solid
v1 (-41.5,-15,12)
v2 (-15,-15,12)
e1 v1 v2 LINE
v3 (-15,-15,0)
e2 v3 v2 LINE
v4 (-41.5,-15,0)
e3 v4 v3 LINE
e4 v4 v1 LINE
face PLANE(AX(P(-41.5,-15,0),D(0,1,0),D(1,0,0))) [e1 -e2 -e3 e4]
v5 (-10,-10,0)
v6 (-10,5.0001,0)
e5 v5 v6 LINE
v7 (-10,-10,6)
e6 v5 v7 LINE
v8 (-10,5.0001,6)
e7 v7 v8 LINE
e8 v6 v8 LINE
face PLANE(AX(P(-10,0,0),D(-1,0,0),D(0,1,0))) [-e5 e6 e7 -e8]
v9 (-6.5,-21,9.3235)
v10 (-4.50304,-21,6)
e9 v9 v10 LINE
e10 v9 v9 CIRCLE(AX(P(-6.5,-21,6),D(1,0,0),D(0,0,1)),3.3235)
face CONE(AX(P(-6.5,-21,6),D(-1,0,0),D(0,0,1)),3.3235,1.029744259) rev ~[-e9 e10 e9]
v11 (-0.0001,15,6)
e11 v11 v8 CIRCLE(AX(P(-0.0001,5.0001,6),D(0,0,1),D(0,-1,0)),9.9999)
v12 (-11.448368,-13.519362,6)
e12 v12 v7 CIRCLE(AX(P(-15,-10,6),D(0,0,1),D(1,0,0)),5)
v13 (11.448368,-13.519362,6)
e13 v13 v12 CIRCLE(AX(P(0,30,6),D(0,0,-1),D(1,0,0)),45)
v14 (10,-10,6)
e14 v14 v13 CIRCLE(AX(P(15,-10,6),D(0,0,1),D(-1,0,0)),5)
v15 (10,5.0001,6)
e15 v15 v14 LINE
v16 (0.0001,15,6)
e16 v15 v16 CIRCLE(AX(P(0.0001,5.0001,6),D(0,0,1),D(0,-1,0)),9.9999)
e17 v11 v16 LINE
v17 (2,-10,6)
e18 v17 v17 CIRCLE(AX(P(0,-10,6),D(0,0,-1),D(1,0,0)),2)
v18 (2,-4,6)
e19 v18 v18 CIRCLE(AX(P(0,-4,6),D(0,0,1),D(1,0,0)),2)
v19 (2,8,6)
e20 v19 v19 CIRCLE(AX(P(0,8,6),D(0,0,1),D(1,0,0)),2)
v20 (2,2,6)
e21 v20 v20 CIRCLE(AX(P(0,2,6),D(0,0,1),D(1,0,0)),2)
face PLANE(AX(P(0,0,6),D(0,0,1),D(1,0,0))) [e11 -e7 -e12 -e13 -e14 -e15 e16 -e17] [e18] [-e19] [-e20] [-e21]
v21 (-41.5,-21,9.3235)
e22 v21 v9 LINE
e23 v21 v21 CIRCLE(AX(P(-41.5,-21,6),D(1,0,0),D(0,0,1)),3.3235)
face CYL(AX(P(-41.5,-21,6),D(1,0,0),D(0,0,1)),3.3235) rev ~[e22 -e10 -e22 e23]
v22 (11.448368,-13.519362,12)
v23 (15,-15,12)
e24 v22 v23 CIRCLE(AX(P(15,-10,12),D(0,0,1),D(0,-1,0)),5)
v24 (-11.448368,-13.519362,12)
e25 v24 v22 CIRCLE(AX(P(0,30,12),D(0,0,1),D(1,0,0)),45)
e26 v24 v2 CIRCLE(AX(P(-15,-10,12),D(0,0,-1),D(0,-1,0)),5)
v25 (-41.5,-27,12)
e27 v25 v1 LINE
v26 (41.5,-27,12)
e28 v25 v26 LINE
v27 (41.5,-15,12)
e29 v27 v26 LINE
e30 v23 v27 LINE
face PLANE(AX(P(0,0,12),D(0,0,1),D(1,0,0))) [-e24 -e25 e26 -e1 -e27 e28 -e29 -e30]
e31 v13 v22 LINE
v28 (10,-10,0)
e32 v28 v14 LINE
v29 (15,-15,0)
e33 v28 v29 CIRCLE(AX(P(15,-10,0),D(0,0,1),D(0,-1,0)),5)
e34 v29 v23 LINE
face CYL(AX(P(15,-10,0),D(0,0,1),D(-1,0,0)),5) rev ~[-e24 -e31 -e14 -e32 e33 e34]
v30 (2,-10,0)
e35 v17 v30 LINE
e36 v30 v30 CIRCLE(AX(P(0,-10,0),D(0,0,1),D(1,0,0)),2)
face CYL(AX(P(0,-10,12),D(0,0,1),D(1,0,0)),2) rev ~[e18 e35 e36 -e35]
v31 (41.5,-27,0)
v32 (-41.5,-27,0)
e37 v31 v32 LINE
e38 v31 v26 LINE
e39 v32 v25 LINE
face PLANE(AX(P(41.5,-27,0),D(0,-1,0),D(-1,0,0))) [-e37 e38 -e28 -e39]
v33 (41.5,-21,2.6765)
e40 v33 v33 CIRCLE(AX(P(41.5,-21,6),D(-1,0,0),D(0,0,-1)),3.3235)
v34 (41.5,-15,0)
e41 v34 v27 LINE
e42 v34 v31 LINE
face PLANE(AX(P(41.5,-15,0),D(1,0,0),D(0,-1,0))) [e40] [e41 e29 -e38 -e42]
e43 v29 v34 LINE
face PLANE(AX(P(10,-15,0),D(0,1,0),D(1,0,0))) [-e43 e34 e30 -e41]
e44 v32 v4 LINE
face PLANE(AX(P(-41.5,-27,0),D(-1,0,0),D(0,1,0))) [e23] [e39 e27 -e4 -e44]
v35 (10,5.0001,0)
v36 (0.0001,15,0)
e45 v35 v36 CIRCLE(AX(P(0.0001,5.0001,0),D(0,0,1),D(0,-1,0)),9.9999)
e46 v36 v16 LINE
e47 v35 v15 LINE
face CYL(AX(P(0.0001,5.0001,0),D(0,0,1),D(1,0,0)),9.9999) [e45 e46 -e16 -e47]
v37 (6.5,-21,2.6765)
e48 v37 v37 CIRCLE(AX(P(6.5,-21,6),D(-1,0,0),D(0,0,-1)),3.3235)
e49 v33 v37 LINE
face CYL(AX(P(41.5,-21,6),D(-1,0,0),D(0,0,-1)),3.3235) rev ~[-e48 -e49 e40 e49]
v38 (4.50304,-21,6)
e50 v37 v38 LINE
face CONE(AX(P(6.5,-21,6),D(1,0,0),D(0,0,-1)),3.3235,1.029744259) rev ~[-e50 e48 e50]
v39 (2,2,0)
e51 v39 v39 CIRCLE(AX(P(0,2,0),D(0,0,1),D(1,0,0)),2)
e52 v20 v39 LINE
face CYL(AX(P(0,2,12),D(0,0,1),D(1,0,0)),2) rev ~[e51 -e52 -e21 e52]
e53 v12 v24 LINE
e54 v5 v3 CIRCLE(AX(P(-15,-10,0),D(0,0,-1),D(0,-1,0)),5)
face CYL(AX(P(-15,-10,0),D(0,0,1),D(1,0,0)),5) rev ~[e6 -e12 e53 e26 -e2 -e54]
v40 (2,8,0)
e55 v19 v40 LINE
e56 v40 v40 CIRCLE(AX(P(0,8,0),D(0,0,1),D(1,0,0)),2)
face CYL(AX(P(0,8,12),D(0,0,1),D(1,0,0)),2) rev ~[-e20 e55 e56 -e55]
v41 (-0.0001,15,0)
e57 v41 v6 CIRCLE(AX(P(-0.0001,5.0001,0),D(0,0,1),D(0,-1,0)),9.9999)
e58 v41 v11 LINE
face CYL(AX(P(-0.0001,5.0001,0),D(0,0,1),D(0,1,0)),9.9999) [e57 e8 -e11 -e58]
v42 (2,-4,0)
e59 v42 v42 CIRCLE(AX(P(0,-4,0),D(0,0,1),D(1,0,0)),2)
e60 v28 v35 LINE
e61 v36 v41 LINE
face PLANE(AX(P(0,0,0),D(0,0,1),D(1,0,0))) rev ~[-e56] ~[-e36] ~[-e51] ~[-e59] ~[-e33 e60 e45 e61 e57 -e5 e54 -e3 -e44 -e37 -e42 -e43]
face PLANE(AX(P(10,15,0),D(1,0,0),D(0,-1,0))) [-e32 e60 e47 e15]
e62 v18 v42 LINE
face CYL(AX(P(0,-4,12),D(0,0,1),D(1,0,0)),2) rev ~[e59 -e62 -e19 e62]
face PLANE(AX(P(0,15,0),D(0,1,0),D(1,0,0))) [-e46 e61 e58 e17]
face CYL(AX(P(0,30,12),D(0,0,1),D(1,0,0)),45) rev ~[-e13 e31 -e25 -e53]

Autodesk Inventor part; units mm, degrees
ref_plane "YZ Plane" through (0, 0, 0) normal (1, 0, 0) x (0, 1, 0)
ref_plane "XZ Plane" through (0, 0, 0) normal (0, 1, 0) x (-1, 0, 0)
ref_plane "XY Plane" through (0, 0, 0) normal (0, 0, 1) x (1, 0, 0)
sketch "Sketch1" plane through (0, 0, 0) normal (0, 0, 1) x (1, 0, 0)
  line L0 (0, 23.4) -> (0, -35.4) projected
  line L1 (-58.1, 0) -> (58.1, 0) projected
  line L2 (-10, 15) -> (10, 15)
  line L3 (10, 15) -> (10, -15)
  line L4 (10, -15) -> (-10, -15)
  line L5 (-10, -15) -> (-10, 15)
  line L6 (-41.5, -15) -> (41.5, -15)
  line L7 (41.5, -15) -> (41.5, -27)
  line L8 (41.5, -27) -> (-41.5, -27)
  line L9 (-41.5, -27) -> (-41.5, -15)
  point P0 (0, 0)
  point P1 (10, -15)
  point P2 (-10, -15)
  dimension "d0" = 30
  dimension "d1" = 12
  dimension "d2" = 83
  dimension "d3" = 20
extrude "Extrusion1" add sketch "Sketch1" along normal blind 12
sketch "Sketch2" plane through (41.5, -27, 0) normal (1, 0, 0) x (0, 0, -1)
  line L0 (0, 12) -> (-12, 12) projected
  line L1 (-12, 0) -> (-12, 12) projected
  point P0 (0, 27)
  point P1 (-6, 6)
  dimension "d6" = 6
  dimension "d7" = 6
hole "Hole1" at (41.5, -21, 6) direction (-1, 0, 0) diameter 6.647 depth 35 tip angle 118 thread size "M8x1.25" class "6H" standard "ISO Metric profile"
sketch "Sketch3" plane through (-41.5, -27, 0) normal (-1, 0, 0) x (0, 0, 1)
  line L0 (0, 12) -> (12, 12) projected
  line L1 (0, 12) -> (0, 0) projected
  point P0 (0, 27)
  point P1 (6, 6)
  dimension "d15" = 6
  dimension "d16" = 6
hole "Hole2" at (-41.5, -21, 6) direction (1, 0, 0) diameter 6.647 depth 35 tip angle 118 thread size "M8x1.25" class "6H" standard "ISO Metric profile"
sketch "Sketch4" plane through (0, 0, 12) normal (0, 0, 1) x (1, 0, 0)
  line L0 (-10, 15) -> (-10, -15) projected
  line L1 (-10, -15) -> (-41.5, -15) projected
  line L2 (-41.5, -15) -> (-41.5, -27) projected
  line L3 (-41.5, -27) -> (41.5, -27) projected
  line L4 (41.5, -27) -> (41.5, -15) projected
  line L5 (41.5, -15) -> (10, -15) projected
  line L6 (10, -15) -> (10, 15) projected
  circle A0 centre (0, -10) radius 2
  line L7 (10, 15) -> (-10, 15) projected
  circle A1 centre (0, -4) radius 2
  circle A2 centre (0, 2) radius 2
  circle A3 centre (0, 8) radius 2
  point P0 (0, 0)
  dimension "d26" = 4
  dimension "d50" = 17
  dimension "d51" = 10
  dimension "d52" = 4
  dimension "d53" = 6
  dimension "d54" = 4
  dimension "d55" = 10
  dimension "d56" = 6
  dimension "d57" = 10
  dimension "d58" = 4
  dimension "d59" = 10
  dimension "d60" = 6
extrude "Extrusion2" cut sketch "Sketch4" against normal through all contours A0 | A1 | A2 | A3
fillet "Fillet2" radius 5 2 edges at (10, -15, 6) (-10, -15, 6)
sketch "Sketch5" plane through (0, 0, 12) normal (0, 0, 1) x (1, 0, 0)
  line L0 (-10, 15) -> (-10, -10) projected
  arc A0 (-15, -15) -> (-10, -10) centre (-15, -10) ccw projected
  line L1 (-15, -15) -> (-41.5, -15) projected
  line L2 (-41.5, -15) -> (-41.5, -27) projected
  line L3 (-41.5, -27) -> (41.5, -27) projected
  line L4 (41.5, -27) -> (41.5, -15) projected
  line L5 (41.5, -15) -> (15, -15) projected
  arc A1 (10, -10) -> (15, -15) centre (15, -10) ccw projected
  line L6 (10, -10) -> (10, 15) projected
  circle A2 centre (0, -10) radius 2 projected
  line L7 (-54.6159, 30) -> (65.6495, 30)
  line L8 (0, 98.4) -> (0, -47.9) projected
  circle A3 centre (0, 30) radius 45
  line L9 (10, 15) -> (-10, 15) projected
  circle A4 centre (0, 8) radius 2 projected
  point P0 (0, 0)
  point P1 (-11.4484, -13.5194)
  point P2 (11.4484, -13.5194)
  point P3 (10.181, -11.3332)
  point P4 (-10.181, -11.3332)
  dimension "d42" = 57
  dimension "d43" = 90
extrude "Extrusion3" cut sketch "Sketch5" against normal blind 6 contours L9 L8 A4 A2 A3 A0 L0 | L0 A0 A3 L7 L8 L9 | L9 L6 A1 A3 L8 A2 A4 | L8 L7 A3 A1 L6 L9 | L8 A3 L7 | L7 A3 L8 | A4 L8 | L8 A4
fillet "Fillet4" radius 10 2 edges at (10, 15, 3) (-10, 15, 3)
properties part number "workTrianglePc1"
